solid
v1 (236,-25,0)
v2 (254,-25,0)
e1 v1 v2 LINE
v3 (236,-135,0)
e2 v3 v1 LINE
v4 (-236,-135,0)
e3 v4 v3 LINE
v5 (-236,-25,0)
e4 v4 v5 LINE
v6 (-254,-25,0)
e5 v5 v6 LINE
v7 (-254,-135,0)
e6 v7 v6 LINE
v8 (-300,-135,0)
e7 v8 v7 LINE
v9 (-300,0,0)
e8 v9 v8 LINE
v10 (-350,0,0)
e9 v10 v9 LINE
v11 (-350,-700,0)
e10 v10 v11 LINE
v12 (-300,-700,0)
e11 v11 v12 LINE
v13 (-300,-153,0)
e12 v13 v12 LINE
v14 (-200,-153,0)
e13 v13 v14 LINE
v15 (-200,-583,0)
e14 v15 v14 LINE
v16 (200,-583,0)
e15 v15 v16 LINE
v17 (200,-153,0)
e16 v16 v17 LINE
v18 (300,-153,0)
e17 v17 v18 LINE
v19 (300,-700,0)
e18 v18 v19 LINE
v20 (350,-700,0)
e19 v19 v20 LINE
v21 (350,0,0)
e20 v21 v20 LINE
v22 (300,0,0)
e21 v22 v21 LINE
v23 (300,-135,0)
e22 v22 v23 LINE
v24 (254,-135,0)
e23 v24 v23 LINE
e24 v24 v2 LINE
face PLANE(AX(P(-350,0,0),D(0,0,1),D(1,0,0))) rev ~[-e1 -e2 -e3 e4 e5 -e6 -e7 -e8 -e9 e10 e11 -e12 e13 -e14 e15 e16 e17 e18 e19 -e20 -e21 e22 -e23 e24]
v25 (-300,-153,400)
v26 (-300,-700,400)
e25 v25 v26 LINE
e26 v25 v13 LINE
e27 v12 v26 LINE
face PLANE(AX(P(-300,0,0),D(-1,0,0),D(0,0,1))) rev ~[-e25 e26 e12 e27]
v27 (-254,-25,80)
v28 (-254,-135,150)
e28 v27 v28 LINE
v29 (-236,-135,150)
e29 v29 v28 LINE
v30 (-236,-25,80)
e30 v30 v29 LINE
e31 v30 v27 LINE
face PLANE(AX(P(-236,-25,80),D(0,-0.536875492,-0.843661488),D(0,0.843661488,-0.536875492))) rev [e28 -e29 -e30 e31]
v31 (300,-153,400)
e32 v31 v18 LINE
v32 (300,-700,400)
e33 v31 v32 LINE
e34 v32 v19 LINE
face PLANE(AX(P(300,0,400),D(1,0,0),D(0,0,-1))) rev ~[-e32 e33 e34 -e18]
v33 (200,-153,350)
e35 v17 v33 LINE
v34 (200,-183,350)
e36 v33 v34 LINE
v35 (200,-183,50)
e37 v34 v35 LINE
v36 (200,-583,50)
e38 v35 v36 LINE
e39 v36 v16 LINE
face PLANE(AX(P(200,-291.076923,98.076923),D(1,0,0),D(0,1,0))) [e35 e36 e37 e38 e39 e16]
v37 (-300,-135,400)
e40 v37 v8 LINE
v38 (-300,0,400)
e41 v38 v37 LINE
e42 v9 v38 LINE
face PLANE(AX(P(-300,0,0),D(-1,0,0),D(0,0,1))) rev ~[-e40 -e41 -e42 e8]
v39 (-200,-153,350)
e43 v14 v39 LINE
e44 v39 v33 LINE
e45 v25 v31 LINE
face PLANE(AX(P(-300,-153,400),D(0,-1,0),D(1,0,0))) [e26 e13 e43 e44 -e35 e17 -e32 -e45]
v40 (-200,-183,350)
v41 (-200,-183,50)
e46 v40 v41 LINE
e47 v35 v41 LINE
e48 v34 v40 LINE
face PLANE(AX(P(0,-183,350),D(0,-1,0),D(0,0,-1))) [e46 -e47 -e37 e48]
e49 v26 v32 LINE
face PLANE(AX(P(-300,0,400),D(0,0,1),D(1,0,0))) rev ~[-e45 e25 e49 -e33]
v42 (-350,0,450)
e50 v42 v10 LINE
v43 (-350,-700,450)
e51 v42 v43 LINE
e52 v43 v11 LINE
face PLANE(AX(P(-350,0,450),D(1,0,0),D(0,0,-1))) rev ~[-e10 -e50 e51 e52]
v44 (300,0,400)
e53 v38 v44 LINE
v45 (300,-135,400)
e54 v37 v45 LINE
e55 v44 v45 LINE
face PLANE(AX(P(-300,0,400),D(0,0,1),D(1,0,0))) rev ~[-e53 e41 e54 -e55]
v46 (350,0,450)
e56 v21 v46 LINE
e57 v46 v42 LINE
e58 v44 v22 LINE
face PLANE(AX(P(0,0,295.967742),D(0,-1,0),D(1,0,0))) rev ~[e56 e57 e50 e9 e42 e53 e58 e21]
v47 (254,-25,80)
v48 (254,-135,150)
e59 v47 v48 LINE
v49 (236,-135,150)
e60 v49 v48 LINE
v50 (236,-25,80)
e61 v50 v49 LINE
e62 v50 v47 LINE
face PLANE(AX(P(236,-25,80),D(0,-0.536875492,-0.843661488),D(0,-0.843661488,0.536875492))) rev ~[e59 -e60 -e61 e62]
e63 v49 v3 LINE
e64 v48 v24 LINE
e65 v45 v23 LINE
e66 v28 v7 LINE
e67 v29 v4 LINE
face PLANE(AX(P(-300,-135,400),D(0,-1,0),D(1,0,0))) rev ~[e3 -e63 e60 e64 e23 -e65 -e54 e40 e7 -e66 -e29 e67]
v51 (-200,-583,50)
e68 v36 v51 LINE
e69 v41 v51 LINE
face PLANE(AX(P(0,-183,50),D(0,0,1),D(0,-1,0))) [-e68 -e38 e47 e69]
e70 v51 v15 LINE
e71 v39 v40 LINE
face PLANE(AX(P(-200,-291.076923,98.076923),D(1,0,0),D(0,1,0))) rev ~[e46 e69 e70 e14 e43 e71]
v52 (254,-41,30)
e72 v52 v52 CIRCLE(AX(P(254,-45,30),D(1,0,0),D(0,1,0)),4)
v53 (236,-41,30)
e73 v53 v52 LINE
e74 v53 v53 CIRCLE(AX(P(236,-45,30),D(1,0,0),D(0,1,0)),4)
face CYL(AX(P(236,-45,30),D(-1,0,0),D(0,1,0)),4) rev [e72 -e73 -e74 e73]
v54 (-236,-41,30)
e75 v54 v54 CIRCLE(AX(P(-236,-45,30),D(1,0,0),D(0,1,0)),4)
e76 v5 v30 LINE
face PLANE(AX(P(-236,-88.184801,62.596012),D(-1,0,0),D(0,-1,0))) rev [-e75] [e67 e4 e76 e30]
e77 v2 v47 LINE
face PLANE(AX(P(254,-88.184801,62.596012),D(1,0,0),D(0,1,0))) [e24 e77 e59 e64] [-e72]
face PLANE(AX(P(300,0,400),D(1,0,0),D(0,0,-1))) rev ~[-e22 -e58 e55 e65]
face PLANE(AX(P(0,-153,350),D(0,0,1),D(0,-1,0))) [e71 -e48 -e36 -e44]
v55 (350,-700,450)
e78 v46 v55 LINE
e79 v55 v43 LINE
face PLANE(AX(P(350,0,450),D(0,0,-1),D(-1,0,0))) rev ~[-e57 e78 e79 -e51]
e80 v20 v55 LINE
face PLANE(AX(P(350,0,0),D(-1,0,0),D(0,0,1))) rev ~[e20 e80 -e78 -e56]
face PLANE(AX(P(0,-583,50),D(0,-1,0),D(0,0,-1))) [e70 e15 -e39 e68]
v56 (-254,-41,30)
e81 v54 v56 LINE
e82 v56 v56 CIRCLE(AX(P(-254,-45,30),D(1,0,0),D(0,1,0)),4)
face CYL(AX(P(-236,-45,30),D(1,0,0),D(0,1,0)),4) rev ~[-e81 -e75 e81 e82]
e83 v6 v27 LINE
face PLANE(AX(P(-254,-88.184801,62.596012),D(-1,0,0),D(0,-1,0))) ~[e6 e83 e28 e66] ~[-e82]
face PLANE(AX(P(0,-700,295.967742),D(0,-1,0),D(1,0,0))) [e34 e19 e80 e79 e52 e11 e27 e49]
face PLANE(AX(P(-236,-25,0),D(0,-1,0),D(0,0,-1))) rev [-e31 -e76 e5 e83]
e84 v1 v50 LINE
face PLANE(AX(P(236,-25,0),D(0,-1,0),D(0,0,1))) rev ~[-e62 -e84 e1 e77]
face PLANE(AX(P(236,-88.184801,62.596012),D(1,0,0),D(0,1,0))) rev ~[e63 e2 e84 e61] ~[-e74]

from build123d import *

# Parameters (mm, degrees)
F1_DEPTH = 700
F2_W     = 600
F2_H     = 18
F3_DEPTH = 400
F6_START = 236
F5_R     = 4
F6_DEPTH = 18
F8_DEPTH = 200


# Not quite as in the source:
# - a pattern or mirror of a feature is missing from the dataset's text; its kind, count and spacing are read off the source's solid


with BuildPart() as f1:
    # F0 (on Front) → F1 (new body)
    with BuildSketch(Plane.XZ):
        Polygon((-350, 0), (-300, 0), (-300, 400), (300, 400), (300, 0), (350, 0), (350, 450), (-350, 450), align=None)
    extrude(amount=F1_DEPTH)

    # F2 (on face) → F3 (join)
    with BuildSketch(Plane(origin=(0, 0, 400), x_dir=(1, 0, 0), z_dir=(0, 0, -1))):
        with Locations((0, 144)):
            Rectangle(F2_W, F2_H)
    extrude(amount=F3_DEPTH)

    # F5 (on Right) → F6 (join)
    with BuildSketch(Plane.YZ.offset(F6_START)):
        Polygon((-135, 150), (-135, 0), (-25, 0), (-25, 80), align=None)
        with Locations((-45, 30)):
            Circle(F5_R, mode=Mode.SUBTRACT)
    f6 = extrude(amount=F6_DEPTH)

    # F6_copies: F6 across plane
    add(f6.mirror(Plane(origin=(0, 0, 0), x_dir=(0, 0, -1), z_dir=(-1, 0, 0))))

    # F7 (on Right) → F8 (join, symmetric)
    with BuildSketch(Plane.YZ):
        Polygon((-583, 50), (-583, 0), (-153, 0), (-153, 350), (-183, 350), (-183, 50), align=None)
    extrude(amount=F8_DEPTH, both=True)


solid = f1.part
